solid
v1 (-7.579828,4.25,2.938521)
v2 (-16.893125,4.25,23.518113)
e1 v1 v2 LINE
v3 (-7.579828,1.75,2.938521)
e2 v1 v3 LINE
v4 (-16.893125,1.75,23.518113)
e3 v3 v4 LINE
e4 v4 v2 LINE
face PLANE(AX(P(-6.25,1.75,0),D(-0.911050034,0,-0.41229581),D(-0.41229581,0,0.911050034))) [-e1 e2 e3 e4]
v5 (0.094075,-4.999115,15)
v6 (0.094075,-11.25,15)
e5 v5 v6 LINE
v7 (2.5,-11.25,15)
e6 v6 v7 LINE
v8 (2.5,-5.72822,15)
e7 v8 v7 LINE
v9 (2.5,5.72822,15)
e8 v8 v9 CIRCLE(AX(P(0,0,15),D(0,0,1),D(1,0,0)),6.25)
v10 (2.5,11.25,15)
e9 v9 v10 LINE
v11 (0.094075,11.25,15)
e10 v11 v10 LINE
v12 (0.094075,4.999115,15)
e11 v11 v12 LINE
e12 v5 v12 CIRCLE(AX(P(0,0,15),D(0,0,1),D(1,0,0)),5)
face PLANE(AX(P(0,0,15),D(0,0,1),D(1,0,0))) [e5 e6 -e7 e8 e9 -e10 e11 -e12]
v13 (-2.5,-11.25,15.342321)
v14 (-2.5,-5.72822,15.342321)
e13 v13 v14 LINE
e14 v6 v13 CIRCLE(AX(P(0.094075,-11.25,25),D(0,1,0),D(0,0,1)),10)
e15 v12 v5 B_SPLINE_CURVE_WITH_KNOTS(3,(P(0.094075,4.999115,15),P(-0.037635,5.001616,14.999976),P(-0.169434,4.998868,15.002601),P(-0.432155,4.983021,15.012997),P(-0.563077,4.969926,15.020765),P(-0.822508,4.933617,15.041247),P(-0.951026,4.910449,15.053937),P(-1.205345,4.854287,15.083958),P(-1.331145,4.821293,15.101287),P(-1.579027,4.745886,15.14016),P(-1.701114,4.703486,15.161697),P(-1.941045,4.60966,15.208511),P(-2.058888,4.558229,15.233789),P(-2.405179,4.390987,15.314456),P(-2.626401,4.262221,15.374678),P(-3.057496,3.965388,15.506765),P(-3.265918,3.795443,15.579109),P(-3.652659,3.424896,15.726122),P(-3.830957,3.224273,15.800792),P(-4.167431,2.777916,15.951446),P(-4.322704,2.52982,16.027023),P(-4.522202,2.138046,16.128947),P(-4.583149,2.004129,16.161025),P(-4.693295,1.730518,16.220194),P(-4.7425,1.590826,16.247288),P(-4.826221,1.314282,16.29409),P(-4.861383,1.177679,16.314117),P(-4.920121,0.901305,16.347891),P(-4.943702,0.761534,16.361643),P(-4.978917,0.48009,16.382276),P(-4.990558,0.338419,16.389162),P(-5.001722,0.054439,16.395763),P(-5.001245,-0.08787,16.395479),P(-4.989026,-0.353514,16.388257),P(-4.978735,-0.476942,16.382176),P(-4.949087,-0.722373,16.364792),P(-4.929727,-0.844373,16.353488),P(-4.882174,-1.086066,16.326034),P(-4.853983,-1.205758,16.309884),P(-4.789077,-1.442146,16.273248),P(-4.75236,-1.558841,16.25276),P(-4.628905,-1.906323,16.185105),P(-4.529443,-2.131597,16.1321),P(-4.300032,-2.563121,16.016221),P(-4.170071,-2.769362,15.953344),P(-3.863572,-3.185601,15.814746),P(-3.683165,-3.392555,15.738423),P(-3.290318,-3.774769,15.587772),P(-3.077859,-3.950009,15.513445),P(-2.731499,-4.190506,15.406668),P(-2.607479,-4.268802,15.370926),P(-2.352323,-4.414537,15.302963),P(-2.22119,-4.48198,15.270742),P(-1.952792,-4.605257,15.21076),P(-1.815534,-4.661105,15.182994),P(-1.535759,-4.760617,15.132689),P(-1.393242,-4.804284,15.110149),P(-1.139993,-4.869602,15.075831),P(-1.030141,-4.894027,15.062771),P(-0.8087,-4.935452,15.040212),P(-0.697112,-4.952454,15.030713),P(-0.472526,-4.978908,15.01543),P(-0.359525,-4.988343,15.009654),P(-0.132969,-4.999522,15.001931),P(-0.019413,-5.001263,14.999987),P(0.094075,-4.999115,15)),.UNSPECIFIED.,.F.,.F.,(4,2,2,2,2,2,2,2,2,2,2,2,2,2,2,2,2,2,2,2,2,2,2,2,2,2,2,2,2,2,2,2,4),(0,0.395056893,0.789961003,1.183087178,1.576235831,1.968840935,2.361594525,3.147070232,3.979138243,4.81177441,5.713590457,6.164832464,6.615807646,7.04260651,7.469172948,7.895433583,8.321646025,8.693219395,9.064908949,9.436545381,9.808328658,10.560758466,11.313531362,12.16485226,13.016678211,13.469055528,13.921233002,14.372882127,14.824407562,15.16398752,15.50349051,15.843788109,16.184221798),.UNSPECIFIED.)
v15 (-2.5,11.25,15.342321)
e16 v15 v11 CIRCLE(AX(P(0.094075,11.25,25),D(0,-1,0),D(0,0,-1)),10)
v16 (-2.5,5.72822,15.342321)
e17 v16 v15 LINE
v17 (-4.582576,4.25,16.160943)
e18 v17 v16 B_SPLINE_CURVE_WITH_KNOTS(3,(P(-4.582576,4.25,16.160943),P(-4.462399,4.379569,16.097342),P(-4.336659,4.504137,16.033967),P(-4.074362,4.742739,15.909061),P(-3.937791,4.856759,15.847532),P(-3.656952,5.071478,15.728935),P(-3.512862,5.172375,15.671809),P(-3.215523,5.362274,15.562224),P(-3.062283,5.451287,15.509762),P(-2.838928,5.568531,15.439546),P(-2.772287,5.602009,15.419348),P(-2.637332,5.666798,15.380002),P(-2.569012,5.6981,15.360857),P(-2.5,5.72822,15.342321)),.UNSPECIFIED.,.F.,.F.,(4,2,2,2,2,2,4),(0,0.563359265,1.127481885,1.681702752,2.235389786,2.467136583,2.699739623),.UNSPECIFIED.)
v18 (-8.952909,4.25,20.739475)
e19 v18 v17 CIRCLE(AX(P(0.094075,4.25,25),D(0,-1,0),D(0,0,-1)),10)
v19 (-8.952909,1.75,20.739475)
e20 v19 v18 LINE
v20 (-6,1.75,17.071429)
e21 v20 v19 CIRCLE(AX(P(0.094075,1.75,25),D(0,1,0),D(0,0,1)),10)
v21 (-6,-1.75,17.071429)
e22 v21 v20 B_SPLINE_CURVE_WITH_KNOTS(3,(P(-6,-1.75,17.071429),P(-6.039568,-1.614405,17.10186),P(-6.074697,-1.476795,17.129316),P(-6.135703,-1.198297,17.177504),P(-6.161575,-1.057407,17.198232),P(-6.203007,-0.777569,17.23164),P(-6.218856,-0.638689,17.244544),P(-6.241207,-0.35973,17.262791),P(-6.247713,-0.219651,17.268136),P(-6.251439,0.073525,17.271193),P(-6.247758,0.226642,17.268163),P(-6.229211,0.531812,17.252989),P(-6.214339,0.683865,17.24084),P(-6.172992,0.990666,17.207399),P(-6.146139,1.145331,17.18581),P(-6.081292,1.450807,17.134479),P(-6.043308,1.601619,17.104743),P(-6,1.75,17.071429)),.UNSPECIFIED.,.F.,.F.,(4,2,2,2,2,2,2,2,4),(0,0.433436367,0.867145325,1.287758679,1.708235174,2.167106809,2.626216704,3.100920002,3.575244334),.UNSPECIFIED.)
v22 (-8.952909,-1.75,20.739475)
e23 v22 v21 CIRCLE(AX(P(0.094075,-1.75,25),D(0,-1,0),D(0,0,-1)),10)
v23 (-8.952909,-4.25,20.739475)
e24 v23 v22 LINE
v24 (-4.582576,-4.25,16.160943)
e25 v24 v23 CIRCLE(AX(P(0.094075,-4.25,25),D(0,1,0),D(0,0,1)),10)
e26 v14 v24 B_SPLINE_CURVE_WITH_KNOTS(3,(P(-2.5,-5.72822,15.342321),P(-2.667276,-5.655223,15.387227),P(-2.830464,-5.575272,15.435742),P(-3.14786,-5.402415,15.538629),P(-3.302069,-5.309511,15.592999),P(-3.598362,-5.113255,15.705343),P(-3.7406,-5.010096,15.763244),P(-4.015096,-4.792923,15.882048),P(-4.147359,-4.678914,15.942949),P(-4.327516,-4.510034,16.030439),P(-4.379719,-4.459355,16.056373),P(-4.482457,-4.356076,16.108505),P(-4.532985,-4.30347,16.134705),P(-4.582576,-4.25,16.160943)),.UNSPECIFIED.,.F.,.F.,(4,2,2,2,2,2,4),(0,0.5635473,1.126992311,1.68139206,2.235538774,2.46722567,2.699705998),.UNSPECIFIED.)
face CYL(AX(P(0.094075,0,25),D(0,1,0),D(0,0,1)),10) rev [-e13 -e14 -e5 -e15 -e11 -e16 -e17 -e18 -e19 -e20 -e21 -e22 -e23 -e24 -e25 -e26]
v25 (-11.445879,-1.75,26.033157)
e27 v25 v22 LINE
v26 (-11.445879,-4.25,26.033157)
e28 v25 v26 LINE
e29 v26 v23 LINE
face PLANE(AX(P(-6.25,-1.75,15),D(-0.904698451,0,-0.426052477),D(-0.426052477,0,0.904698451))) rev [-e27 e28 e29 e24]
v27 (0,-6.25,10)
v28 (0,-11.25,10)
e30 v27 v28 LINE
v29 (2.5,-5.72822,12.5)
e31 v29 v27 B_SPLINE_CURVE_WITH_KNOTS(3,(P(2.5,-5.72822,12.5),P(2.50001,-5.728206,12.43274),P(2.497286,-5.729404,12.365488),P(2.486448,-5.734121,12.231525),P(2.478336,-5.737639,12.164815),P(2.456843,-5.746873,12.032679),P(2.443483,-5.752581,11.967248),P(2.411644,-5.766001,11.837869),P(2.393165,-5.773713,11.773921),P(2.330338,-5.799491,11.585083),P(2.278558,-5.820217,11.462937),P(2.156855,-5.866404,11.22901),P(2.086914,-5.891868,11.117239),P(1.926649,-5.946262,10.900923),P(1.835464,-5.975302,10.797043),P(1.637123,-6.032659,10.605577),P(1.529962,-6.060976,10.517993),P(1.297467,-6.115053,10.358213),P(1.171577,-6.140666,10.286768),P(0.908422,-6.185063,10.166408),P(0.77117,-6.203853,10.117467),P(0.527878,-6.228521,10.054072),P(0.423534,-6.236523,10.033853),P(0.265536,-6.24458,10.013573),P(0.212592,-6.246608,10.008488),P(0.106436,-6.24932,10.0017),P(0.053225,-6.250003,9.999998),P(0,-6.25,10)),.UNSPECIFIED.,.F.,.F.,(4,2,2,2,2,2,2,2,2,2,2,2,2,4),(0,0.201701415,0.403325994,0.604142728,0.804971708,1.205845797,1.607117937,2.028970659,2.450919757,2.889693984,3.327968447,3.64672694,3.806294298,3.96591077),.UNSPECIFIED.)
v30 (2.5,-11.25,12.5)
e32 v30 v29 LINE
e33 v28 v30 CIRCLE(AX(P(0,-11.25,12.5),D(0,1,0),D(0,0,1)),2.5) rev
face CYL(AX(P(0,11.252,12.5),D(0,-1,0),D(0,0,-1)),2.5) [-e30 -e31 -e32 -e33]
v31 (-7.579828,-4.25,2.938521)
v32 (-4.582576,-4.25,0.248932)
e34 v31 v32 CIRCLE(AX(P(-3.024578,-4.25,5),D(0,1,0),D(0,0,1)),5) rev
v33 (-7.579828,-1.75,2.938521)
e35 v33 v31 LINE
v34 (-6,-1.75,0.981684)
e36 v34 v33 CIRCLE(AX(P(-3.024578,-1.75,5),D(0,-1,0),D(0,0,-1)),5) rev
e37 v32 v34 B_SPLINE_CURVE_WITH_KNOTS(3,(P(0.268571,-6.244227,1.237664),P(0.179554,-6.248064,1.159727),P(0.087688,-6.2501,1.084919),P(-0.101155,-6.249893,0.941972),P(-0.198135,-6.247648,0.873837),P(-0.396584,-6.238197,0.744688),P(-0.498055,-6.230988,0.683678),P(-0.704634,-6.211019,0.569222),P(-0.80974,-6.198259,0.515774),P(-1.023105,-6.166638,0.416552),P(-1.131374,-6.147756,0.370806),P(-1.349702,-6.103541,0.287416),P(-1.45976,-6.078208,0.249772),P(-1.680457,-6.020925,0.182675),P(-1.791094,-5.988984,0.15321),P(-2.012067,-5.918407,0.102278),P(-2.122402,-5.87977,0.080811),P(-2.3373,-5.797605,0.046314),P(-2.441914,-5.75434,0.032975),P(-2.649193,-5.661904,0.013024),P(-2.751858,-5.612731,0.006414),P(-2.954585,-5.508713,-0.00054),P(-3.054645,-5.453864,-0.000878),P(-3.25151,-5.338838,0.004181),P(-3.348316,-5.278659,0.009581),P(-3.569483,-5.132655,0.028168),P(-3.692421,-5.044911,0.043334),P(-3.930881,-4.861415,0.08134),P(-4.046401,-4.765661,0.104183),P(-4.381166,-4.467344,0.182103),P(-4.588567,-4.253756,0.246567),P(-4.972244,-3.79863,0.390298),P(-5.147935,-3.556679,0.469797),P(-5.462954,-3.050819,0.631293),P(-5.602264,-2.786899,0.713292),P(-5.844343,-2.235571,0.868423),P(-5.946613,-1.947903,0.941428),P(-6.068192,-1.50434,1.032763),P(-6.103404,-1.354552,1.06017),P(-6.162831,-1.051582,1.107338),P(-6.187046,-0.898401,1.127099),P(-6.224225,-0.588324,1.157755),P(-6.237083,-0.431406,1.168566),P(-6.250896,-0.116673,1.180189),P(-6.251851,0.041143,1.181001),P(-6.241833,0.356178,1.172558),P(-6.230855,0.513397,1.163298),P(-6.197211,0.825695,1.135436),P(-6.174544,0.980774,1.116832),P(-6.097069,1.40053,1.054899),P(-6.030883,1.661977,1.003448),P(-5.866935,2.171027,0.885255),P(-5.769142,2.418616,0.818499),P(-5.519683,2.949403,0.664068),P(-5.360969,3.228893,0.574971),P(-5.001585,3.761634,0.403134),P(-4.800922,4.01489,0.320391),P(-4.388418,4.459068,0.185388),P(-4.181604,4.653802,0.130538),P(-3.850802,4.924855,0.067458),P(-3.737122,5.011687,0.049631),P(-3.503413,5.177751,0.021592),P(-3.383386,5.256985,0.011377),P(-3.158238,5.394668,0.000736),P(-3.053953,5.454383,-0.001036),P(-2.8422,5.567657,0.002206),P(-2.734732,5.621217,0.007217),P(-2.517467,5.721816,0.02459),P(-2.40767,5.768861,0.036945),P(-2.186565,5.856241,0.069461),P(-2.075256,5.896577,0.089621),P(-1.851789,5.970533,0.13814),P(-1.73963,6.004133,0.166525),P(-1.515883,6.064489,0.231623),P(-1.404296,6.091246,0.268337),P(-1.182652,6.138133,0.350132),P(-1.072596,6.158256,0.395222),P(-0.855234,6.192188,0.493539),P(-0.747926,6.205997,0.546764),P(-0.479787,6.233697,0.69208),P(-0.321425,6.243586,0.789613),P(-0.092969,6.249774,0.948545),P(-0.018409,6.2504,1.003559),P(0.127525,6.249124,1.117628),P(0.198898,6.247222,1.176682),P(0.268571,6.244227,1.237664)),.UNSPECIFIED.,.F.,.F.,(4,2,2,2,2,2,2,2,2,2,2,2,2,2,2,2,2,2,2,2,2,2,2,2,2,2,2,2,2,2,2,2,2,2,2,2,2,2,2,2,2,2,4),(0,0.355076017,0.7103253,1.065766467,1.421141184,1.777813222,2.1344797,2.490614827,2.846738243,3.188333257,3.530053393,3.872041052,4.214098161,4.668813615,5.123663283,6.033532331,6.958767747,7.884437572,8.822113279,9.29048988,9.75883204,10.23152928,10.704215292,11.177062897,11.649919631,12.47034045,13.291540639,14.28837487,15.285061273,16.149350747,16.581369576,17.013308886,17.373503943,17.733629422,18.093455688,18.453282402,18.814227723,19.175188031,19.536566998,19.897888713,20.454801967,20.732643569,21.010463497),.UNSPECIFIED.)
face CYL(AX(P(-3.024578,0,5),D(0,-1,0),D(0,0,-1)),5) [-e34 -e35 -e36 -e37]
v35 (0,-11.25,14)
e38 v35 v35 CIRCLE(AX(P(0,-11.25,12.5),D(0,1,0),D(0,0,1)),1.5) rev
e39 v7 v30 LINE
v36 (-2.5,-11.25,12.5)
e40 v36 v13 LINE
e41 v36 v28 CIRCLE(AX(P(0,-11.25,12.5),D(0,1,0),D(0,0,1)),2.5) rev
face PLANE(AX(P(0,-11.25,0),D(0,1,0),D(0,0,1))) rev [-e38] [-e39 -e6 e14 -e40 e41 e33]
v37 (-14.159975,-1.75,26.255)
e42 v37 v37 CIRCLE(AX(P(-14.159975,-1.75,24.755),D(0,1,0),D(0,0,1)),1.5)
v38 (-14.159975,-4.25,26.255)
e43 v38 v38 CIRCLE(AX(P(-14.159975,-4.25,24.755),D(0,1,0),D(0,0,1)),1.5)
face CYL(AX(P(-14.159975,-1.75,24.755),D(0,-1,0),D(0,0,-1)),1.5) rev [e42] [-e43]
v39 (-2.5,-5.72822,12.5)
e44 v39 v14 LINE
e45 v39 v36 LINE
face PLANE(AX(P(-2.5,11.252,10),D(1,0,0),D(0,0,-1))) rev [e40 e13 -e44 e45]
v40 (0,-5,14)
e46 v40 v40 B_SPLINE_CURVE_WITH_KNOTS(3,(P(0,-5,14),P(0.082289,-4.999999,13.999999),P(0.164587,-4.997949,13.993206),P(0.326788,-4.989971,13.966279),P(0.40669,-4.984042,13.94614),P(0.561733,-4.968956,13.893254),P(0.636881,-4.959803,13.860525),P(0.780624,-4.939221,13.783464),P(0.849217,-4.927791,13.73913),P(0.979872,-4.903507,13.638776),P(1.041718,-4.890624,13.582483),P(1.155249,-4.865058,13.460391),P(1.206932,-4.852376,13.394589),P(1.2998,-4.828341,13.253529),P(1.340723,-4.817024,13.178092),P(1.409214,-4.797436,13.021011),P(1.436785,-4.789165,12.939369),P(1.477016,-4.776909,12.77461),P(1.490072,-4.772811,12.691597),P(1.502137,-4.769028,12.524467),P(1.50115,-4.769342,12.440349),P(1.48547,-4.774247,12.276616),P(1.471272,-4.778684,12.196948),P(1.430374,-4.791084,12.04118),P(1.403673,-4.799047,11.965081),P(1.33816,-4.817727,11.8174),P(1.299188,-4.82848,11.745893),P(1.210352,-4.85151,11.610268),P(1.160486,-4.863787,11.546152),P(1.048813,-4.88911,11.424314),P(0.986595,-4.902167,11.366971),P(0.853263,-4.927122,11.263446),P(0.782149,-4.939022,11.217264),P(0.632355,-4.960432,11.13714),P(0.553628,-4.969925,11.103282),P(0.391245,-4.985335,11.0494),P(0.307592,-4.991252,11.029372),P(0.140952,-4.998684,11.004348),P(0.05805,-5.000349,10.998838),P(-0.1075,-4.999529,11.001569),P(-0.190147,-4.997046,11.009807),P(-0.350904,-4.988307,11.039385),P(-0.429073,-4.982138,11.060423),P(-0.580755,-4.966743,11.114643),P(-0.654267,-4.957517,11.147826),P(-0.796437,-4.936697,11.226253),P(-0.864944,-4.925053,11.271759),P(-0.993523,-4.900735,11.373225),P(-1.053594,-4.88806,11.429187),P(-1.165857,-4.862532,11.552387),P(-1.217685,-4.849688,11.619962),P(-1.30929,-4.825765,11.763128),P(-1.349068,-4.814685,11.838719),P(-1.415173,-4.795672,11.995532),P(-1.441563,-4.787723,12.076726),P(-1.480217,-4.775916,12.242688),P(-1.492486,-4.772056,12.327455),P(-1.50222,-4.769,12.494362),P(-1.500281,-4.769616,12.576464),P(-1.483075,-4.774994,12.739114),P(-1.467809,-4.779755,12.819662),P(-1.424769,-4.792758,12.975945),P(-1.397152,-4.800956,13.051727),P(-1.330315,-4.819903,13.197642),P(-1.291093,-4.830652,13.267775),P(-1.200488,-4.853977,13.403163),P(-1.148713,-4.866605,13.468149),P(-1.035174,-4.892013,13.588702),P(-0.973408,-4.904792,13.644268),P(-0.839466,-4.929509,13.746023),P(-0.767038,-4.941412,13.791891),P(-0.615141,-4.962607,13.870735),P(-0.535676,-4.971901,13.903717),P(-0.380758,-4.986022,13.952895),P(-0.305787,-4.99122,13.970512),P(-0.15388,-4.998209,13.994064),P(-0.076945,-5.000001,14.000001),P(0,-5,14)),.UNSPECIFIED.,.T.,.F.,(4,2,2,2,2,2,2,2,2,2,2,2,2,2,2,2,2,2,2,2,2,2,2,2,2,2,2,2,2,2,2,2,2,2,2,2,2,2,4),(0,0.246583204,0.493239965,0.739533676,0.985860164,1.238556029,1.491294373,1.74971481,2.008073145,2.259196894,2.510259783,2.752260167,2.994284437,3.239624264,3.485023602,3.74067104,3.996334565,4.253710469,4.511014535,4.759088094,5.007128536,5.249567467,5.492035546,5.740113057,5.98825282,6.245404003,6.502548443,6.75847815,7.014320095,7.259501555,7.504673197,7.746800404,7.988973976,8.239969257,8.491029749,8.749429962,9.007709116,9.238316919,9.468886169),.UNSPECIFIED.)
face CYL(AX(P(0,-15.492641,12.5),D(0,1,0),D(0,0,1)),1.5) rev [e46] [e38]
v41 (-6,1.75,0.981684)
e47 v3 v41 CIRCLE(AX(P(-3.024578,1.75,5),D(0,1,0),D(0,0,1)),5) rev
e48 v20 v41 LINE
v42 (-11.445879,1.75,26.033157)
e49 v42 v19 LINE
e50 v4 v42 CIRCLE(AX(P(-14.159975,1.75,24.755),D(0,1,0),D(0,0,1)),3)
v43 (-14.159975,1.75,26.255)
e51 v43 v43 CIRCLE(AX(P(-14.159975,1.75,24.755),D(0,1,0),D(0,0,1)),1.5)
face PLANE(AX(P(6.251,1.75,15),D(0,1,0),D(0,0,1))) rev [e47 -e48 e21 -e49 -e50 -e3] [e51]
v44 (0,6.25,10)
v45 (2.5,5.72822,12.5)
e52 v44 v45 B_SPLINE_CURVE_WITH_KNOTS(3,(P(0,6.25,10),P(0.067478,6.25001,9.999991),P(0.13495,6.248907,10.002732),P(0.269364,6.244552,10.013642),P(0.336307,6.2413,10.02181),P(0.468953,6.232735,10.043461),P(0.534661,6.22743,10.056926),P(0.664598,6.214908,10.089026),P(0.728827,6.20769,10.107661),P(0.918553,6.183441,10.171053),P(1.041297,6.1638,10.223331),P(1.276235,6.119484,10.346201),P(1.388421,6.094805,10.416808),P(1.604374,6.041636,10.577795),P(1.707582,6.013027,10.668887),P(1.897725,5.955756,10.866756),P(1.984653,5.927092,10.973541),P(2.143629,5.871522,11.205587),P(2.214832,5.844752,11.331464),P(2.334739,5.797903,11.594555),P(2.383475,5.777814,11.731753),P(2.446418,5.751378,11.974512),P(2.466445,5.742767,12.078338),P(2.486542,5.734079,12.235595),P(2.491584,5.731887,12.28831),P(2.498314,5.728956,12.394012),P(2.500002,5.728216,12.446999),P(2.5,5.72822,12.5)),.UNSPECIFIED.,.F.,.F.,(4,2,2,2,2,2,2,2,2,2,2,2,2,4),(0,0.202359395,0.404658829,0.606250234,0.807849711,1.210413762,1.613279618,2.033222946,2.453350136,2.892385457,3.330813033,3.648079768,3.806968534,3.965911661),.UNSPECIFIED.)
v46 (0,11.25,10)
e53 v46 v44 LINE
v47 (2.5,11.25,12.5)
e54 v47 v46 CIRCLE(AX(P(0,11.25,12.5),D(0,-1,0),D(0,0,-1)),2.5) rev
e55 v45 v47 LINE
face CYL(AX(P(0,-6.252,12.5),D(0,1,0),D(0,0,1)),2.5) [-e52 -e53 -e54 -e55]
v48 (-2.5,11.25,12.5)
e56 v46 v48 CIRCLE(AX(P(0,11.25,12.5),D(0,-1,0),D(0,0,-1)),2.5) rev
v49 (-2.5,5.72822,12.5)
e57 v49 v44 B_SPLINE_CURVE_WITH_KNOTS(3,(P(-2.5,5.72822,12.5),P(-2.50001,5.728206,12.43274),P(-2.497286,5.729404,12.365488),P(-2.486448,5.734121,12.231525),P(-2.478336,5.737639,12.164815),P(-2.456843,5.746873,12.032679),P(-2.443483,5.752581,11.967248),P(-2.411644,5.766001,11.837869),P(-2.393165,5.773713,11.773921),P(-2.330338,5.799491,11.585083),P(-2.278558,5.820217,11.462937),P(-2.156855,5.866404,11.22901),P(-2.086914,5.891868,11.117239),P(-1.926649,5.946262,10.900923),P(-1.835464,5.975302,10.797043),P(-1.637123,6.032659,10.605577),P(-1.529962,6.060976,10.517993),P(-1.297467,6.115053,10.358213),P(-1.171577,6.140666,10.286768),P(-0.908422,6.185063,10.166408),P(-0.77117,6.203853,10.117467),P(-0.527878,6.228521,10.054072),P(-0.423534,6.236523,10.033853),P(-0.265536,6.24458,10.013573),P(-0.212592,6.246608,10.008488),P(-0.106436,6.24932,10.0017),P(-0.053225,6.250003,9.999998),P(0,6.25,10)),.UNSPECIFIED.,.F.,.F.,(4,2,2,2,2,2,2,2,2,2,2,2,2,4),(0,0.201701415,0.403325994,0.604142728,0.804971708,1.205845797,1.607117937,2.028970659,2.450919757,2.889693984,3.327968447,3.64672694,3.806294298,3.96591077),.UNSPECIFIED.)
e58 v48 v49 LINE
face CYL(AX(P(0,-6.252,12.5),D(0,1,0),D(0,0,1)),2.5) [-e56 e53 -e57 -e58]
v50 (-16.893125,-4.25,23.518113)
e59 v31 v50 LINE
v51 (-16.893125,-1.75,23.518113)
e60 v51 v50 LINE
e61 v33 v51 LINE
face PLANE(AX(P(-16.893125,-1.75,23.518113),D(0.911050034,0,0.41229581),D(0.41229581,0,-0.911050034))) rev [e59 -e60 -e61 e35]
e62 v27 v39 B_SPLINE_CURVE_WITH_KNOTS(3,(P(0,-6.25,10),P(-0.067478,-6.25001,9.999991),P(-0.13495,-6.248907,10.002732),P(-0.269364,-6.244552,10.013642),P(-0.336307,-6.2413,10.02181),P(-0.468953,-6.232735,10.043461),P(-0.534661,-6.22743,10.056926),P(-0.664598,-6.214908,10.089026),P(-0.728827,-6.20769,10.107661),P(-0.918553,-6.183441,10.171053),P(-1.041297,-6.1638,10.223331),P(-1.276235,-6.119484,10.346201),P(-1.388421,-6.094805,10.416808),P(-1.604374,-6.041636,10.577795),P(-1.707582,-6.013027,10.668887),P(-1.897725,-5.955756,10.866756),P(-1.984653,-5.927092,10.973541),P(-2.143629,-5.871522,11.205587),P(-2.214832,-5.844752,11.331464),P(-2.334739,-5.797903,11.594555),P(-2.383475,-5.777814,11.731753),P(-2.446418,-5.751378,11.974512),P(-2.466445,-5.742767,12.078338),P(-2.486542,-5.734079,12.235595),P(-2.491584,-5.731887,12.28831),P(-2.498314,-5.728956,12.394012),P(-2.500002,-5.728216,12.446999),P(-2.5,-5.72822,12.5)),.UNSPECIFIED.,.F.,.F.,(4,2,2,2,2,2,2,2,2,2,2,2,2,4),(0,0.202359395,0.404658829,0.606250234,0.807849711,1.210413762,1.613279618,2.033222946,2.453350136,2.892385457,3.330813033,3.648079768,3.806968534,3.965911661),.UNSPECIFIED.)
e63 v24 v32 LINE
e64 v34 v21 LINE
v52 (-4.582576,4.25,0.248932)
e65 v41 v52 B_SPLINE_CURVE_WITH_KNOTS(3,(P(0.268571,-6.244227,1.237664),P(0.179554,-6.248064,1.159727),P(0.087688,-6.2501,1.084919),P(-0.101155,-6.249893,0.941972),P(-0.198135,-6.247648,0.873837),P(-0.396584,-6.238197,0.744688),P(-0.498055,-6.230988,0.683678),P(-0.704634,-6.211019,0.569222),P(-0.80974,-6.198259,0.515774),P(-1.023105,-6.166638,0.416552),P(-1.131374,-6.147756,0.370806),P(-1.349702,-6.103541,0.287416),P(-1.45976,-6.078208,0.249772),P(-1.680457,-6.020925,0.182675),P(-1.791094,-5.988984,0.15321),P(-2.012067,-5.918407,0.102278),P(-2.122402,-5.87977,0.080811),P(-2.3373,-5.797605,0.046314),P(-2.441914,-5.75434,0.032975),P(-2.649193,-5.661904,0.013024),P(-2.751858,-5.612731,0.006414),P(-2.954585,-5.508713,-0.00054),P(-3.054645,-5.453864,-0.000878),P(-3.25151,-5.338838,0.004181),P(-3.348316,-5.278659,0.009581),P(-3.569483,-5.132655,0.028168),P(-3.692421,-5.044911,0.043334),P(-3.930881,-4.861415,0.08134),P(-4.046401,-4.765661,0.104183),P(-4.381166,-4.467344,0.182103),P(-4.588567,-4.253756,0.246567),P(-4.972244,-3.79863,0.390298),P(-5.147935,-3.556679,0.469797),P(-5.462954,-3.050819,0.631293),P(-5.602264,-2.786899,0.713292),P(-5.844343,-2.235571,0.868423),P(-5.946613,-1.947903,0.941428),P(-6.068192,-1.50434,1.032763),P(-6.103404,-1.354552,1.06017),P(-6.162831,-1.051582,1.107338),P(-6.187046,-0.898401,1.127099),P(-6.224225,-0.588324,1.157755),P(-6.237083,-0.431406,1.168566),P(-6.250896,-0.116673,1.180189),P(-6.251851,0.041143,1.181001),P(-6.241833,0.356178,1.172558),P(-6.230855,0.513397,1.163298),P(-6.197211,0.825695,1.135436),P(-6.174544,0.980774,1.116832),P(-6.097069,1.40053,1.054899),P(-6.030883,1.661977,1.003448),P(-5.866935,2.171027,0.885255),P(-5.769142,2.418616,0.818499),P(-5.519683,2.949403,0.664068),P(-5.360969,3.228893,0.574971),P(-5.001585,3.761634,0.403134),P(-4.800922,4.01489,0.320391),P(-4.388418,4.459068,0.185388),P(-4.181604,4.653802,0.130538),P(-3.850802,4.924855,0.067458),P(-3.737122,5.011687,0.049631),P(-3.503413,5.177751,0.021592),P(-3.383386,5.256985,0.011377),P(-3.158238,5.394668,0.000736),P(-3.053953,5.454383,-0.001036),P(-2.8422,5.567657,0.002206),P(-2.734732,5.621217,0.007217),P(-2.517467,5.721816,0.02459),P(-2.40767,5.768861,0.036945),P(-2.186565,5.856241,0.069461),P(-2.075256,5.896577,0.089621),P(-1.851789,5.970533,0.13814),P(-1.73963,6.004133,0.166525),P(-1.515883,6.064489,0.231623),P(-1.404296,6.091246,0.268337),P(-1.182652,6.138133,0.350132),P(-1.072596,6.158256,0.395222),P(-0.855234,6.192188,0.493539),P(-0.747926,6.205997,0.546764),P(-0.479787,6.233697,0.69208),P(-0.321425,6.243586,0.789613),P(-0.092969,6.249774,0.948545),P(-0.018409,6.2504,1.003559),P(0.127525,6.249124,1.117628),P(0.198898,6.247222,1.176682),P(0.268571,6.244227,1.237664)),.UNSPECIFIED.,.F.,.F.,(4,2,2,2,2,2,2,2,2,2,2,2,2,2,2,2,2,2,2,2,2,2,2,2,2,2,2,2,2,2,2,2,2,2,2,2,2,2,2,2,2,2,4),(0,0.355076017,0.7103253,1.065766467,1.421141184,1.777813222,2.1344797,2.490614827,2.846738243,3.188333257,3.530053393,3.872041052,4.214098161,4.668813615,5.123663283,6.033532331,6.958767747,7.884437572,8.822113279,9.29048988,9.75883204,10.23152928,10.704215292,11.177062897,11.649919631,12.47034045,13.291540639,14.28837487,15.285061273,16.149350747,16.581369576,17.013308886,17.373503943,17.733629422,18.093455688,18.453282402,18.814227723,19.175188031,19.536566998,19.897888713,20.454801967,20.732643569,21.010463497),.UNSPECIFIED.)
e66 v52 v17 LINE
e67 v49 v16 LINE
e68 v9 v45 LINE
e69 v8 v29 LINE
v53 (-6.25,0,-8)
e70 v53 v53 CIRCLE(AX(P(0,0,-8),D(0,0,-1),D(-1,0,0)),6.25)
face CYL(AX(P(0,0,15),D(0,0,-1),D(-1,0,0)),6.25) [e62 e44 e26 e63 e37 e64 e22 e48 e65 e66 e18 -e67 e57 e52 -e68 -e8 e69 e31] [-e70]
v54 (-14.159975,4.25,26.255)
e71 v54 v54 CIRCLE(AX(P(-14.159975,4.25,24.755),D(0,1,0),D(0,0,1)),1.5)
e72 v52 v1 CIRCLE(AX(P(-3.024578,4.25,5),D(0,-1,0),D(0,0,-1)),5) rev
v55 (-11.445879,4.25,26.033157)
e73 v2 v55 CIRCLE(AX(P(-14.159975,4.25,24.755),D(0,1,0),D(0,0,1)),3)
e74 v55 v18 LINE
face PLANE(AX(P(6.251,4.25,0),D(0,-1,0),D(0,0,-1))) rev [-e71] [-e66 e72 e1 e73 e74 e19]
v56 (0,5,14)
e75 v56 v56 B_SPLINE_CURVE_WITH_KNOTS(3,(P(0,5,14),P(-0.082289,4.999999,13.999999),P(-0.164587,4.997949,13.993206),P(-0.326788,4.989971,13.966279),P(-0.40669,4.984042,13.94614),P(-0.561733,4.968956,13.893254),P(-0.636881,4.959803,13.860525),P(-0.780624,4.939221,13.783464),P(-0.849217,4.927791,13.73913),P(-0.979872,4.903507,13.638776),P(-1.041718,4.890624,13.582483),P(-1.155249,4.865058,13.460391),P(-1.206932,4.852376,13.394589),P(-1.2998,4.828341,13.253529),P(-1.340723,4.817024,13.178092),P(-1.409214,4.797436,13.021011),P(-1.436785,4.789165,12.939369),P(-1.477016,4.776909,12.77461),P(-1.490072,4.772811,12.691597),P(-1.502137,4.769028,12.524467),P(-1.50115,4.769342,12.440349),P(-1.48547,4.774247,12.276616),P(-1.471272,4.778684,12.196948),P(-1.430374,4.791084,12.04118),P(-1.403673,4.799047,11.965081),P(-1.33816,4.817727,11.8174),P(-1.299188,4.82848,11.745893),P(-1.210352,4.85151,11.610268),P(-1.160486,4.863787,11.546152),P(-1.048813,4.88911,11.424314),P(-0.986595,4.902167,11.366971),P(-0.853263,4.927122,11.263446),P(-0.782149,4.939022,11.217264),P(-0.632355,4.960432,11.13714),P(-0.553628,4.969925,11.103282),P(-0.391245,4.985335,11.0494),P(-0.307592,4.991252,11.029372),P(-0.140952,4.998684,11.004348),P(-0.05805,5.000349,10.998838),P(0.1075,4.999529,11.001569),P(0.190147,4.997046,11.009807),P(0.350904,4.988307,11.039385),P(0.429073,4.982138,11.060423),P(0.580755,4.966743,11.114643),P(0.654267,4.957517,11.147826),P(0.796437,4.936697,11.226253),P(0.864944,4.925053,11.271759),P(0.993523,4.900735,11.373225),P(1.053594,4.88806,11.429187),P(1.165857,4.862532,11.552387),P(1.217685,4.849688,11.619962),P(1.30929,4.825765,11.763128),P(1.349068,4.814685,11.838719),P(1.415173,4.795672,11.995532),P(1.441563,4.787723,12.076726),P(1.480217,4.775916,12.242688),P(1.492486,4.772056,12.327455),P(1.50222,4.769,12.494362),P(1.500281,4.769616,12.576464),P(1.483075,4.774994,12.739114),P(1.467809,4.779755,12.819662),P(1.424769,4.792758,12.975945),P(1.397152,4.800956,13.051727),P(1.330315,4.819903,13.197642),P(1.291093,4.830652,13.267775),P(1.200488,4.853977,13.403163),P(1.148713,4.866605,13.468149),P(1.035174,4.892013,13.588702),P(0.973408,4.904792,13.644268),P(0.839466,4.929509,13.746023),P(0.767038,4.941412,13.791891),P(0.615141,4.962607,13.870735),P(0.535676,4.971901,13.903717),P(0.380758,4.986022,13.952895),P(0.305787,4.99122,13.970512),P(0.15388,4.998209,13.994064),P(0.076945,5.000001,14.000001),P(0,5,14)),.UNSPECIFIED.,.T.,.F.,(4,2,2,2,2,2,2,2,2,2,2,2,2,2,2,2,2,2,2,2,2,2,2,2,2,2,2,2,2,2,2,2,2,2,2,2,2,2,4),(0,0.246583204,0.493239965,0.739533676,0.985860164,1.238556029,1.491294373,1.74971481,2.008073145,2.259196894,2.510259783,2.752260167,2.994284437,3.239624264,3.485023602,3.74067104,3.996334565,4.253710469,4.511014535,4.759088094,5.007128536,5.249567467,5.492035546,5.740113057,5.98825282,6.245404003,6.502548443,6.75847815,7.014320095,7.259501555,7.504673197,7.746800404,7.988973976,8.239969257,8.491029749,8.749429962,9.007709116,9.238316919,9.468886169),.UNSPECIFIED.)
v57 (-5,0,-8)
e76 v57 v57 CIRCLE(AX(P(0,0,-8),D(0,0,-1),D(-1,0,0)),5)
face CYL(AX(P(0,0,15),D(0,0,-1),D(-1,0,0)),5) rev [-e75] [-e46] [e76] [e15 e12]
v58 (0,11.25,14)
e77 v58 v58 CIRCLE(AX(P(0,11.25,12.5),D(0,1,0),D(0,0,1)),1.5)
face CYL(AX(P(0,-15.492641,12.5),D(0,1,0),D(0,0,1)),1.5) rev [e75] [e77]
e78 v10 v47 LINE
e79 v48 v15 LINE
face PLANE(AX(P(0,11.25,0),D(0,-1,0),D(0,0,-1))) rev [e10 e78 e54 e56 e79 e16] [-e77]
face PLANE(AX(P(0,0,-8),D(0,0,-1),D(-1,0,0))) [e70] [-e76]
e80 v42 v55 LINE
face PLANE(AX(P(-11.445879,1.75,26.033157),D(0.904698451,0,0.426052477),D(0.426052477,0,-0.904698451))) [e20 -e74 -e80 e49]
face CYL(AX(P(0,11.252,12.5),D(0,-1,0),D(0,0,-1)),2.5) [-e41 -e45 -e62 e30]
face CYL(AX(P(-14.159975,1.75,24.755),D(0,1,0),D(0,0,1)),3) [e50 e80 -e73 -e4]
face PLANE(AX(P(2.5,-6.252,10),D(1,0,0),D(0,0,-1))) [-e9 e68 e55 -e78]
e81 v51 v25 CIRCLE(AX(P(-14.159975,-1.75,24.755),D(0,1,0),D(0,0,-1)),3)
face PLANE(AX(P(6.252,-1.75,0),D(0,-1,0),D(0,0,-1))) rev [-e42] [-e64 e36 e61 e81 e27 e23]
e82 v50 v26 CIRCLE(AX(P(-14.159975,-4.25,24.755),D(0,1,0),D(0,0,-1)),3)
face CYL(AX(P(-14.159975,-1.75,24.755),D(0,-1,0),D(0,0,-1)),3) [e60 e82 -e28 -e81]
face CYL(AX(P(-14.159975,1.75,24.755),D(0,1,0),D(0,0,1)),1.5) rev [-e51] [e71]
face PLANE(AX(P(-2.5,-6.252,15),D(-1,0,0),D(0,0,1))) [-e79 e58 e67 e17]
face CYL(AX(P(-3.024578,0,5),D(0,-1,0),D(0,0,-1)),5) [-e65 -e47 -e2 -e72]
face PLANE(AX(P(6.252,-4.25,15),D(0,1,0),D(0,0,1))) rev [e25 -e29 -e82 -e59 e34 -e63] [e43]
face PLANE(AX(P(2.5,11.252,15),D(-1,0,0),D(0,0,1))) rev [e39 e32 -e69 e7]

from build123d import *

# Parameters (mm, degrees)
CROQUIS1_R                   = 6.25
CROQUIS1_R_2                 = 5
SALIENTE_EXTRUIR1_DEPTH      = 15
SALIENTE_EXTRUIR2_REACH      = 25.881
SALIENTE_EXTRUIR2_END_RADIUS = 6.25
CROQUIS2_W                   = 5
CROQUIS2_H                   = 5
SALIENTE_EXTRUIR3_REACH      = 29.755
SALIENTE_EXTRUIR3_END_RADIUS = 6.25
CROQUIS3_W                   = 5
CROQUIS3_H                   = 5
CORTAR_EXTRUIR1_REACH        = 29.755
CROQUIS4_R                   = 1.5
REDONDEO1_R                  = 2.5
CROQUIS5_R                   = 1.5
SALIENTE_EXTRUIR4_DEPTH      = 2.5
SALIENTE_EXTRUIR5_REACH      = 34.452
CROQUIS6_W                   = 15
CROQUIS6_H                   = 2.5
CROQUIS7_R                   = 1.5
SALIENTE_EXTRUIR6_DEPTH      = 2.5
SALIENTE_EXTRUIR7_REACH      = 34.452
SALIENTE_EXTRUIR7_END_RADIUS = 6.25
CROQUIS8_W                   = 15
CROQUIS8_H                   = 2.5
REDONDEO2_R                  = 5
REDONDEO4_R                  = 10
SALIENTE_EXTRUIR9_REACH      = 43.224
CROQUIS10_R                  = 6.25
CROQUIS10_R_2                = 5


# Some blends are built 0.0001 mm under size
with BuildPart() as part:
    # Croquis1 → Saliente-Extruir1 (new body)
    with BuildSketch(Plane.XY):
        Circle(CROQUIS1_R)
        Circle(CROQUIS1_R_2, mode=Mode.SUBTRACT)
    extrude(amount=SALIENTE_EXTRUIR1_DEPTH)

    # Saliente-Extruir2: up to this cylinder (the profile starts outside it)
    saliente_extruir2_end = Plane(origin=(0, 0, 12.5), z_dir=(0, 0, -1)) * Cylinder(SALIENTE_EXTRUIR2_END_RADIUS, 65.262, mode=Mode.PRIVATE)
    # Croquis2 → Saliente-Extruir2 (add, up to the surface)
    with BuildSketch(Plane(origin=(0, 11.25, 0), x_dir=(1, 0, 0), z_dir=(0, 1, 0)), mode=Mode.PRIVATE) as saliente_extruir2_sk1:
        with Locations((0, -12.5)):
            Rectangle(CROQUIS2_W, CROQUIS2_H)
    saliente_extruir2_tool1 = extrude(saliente_extruir2_sk1.sketch, amount=-SALIENTE_EXTRUIR2_REACH, mode=Mode.PRIVATE) - saliente_extruir2_end
    add(saliente_extruir2_tool1.solids().sort_by_distance((0, 11.25, 12.5))[0])

    # Saliente-Extruir3: up to this cylinder (the profile starts outside it)
    saliente_extruir3_end = Plane(origin=(0, 0, 12.5), z_dir=(0, 0, -1)) * Cylinder(SALIENTE_EXTRUIR3_END_RADIUS, 73.01, mode=Mode.PRIVATE)
    # Croquis3 → Saliente-Extruir3 (add, up to the surface)
    with BuildSketch(Plane(origin=(0, -11.25, 0), x_dir=(1, 0, 0), z_dir=(0, 1, 0)), mode=Mode.PRIVATE) as saliente_extruir3_sk1:
        with Locations((0, -12.5)):
            Rectangle(CROQUIS3_W, CROQUIS3_H)
    saliente_extruir3_tool1 = extrude(saliente_extruir3_sk1.sketch, amount=SALIENTE_EXTRUIR3_REACH, mode=Mode.PRIVATE) - saliente_extruir3_end
    add(saliente_extruir3_tool1.solids().sort_by_distance((0, -11.25, 12.5))[0])

    # Cortar-Extruir1: up to this face of the body (flat: up to its plane)
    cortar_extruir1_end = Plane(part.part.faces().sort_by_distance((0, -11.25, 12.5))[0])
    # Croquis4 → Cortar-Extruir1 (cut, up to the picked face)
    with BuildSketch(Plane(origin=(0, 11.25, 0), x_dir=(1, 0, 0), z_dir=(0, 1, 0)), mode=Mode.PRIVATE) as cortar_extruir1_sk1:
        with Locations(Location((0, -12.5, 0), (0, 0, 270))):
            Circle(CROQUIS4_R)
    cortar_extruir1_tool1 = split(extrude(cortar_extruir1_sk1.sketch, amount=-CORTAR_EXTRUIR1_REACH, mode=Mode.PRIVATE), bisect_by=cortar_extruir1_end, keep=Keep.BOTH, mode=Mode.PRIVATE)
    add(cortar_extruir1_tool1.solids().sort_by(Axis((0, 11.25, 12.5), (0, -1, 0)))[0], mode=Mode.SUBTRACT)

    # Redondeo1
    redondeo1_edges = [part.edges().sort_by_distance(p)[0] for p in [
        (-2.5, -8.489109809, 10),
        (2.5, -8.489109809, 10),
        (-2.5, 8.489109809, 10),
        (2.5, 8.489109809, 10),
    ]]
    fillet(redondeo1_edges, radius=REDONDEO1_R - 0.0001)  # a hair under: the kernel refuses the full size

    # Croquis6 → Saliente-Extruir5 (add, up to next)
    with BuildSketch(Plane(origin=(-6.25, 0, 0), x_dir=(0, 0, -1), z_dir=(1, 0, 0)), mode=Mode.PRIVATE) as saliente_extruir5_sk1:
        with Locations((-7.5, -3)):
            Rectangle(CROQUIS6_W, CROQUIS6_H)
    saliente_extruir5_tool1 = extrude(saliente_extruir5_sk1.sketch, amount=SALIENTE_EXTRUIR5_REACH, mode=Mode.PRIVATE) - part.part


with BuildPart() as body_2:
    # Croquis5 → Saliente-Extruir4 (new body)
    with BuildSketch(Plane(origin=(0, -4.25, 0), x_dir=(1, 0, 0), z_dir=(0, 1, 0))):
        with BuildLine():
            Line((-6.25, -15), (-11.445879417, -26.033157432))
            ThreePointArc((-11.445879417, -26.033157432), (-15.41753329, -27.478700895), (-16.893124871, -23.518112569))
            Line((-16.893124871, -23.518112569), (-6.25, 0))
            Line((-6.25, 0), (-6.25, -15))
        make_face()
        with Locations(Location((-14.159974768, -24.755, 0), (0, 0, 270))):
            Circle(CROQUIS5_R, mode=Mode.SUBTRACT)
    extrude(amount=SALIENTE_EXTRUIR4_DEPTH)


with BuildPart() as part_1:
    add(part.part)

    add(body_2.part)  # Saliente-Extruir5 merges body 2
    add(saliente_extruir5_tool1.solids().sort_by_distance((-6.25, -3, 7.5))[0])



with BuildPart() as body_2_2:
    # Croquis7 → Saliente-Extruir6 (new body)
    with BuildSketch(Plane(origin=(0, 4.25, 0), x_dir=(1, 0, 0), z_dir=(0, 1, 0))):
        with BuildLine():
            Line((-11.445879417, -26.033157432), (-6.25, -15))
            Line((-6.25, -15), (-6.25, 0))
            Line((-6.25, 0), (-16.893124871, -23.518112569))
            ThreePointArc((-16.893124871, -23.518112569), (-15.41753329, -27.478700895), (-11.445879417, -26.033157432))
        make_face()
        with Locations(Location((-14.159974768, -24.755, 0), (0, 0, 270))):
            Circle(CROQUIS7_R, mode=Mode.SUBTRACT)
    extrude(amount=-SALIENTE_EXTRUIR6_DEPTH)


with BuildPart() as part_2:
    add(part_1.part)

    add(body_2_2.part)  # Saliente-Extruir7 merges body 2 2
    # Saliente-Extruir7: up to this cylinder (the profile starts outside it)
    saliente_extruir7_end = Plane(origin=(0, 0, 7.5), z_dir=(0, 0, -1)) * Cylinder(SALIENTE_EXTRUIR7_END_RADIUS, 82.404, mode=Mode.PRIVATE)
    # Croquis8 → Saliente-Extruir7 (add, up to the surface)
    with BuildSketch(Plane(origin=(-6.25, 0, 0), x_dir=(0, 0, -1), z_dir=(1, 0, 0)), mode=Mode.PRIVATE) as saliente_extruir7_sk1:
        with Locations((-7.5, 3)):
            Rectangle(CROQUIS8_W, CROQUIS8_H)
    saliente_extruir7_tool1 = extrude(saliente_extruir7_sk1.sketch, amount=SALIENTE_EXTRUIR7_REACH, mode=Mode.PRIVATE) - saliente_extruir7_end
    add(saliente_extruir7_tool1.solids().sort_by_distance((-6.25, 3, 7.5))[0])

    # Redondeo2
    # the kernel refuses this fillet: 5 mm, written as the material it takes off along each edge
    with BuildSketch(Plane(origin=(-6.25, 12.313555344, 0), x_dir=(1, 0, 0), z_dir=(0, -1, 0))) as redondeo2_piece_1:
        with BuildLine():
            CenterArc((REDONDEO2_R * 0.645084427485, REDONDEO2_R), REDONDEO2_R, 204.349135832, 65.650864168)
            Line((-REDONDEO2_R * 0.265965606724, REDONDEO2_R * 0.587704189728), (0, 0))
            Line((0, 0), (REDONDEO2_R * 0.645084427485, 0))
        make_face()
    extrude(amount=18.627110687, mode=Mode.SUBTRACT)

    # Redondeo4
    # the kernel refuses this fillet: 10 mm, written as the material it adds along each edge
    with BuildSketch(Plane(origin=(-6.25, 20.110188614, 15), x_dir=(1, 0, 0), z_dir=(0, -1, 0))) as redondeo4_piece_1_section:
        with BuildLine():
            CenterArc((REDONDEO4_R * 0.634407544548, REDONDEO4_R), REDONDEO4_R, 205.2173, 64.7827)
            Line((-REDONDEO4_R * 0.27029090604, REDONDEO4_R * 0.573947522594), (0, 0))
            Line((0, 0), (REDONDEO4_R * 0.634407544548, 0))
        make_face()
    redondeo4_piece_1 = extrude(amount=34.220377227, mode=Mode.PRIVATE)
    redondeo4_piece_1 = split(redondeo4_piece_1, bisect_by=Plane(origin=(-2.5, 8.596165387, 15.10356988), z_dir=(1, 0, 0)), keep=Keep.TOP, mode=Mode.PRIVATE)
    redondeo4_piece_1 = split(redondeo4_piece_1, bisect_by=Plane(origin=(-1.866709216, -11.25, 15.10356988), z_dir=(0, 1, 0)), keep=Keep.TOP, mode=Mode.PRIVATE)
    redondeo4_piece_1 = split(redondeo4_piece_1, bisect_by=Plane(origin=(-1.866709216, 11.25, 15.10356988), z_dir=(0, -1, 0)), keep=Keep.TOP, mode=Mode.PRIVATE)
    redondeo4_piece_1 = redondeo4_piece_1 - Plane(origin=(0, 0, 15.10356988), x_dir=(1, 0, 0), z_dir=(0, 0, -1)) * Cylinder(5, 94, mode=Mode.PRIVATE)
    add(redondeo4_piece_1)
    with BuildSketch(Plane(origin=(-6.25, 4.25, 15), x_dir=(1, 0, 0), z_dir=(0, -1, 0))) as redondeo4_piece_2_section:
        with BuildLine():
            CenterArc((REDONDEO4_R * 0.634407544548, REDONDEO4_R), REDONDEO4_R, 205.2173, 64.7827)
            Line((-REDONDEO4_R * 0.27029090604, REDONDEO4_R * 0.573947522594), (0, 0))
            Line((0, 0), (REDONDEO4_R * 0.634407544548, 0))
        make_face()
    redondeo4_piece_2 = extrude(amount=2.5, mode=Mode.PRIVATE)
    redondeo4_piece_2 = redondeo4_piece_2 - Plane(origin=(0, 0, 16.752062652), x_dir=(1, 0, 0), z_dir=(0, 0, -1)) * Cylinder(5, 31, mode=Mode.PRIVATE)
    add(redondeo4_piece_2)
    with BuildSketch(Plane(origin=(-6.25, 20.110188614, 15), x_dir=(1, 0, 0), z_dir=(0, -1, 0))) as redondeo4_piece_3_section:
        with BuildLine():
            CenterArc((REDONDEO4_R * 0.634407544548, REDONDEO4_R), REDONDEO4_R, 205.2173, 64.7827)
            Line((-REDONDEO4_R * 0.27029090604, REDONDEO4_R * 0.573947522594), (0, 0))
            Line((0, 0), (REDONDEO4_R * 0.634407544548, 0))
        make_face()
    redondeo4_piece_3 = extrude(amount=34.220377227, mode=Mode.PRIVATE)
    redondeo4_piece_3 = redondeo4_piece_3 & Plane(origin=(0, 0, 15.324058302), x_dir=(1, 0, 0), z_dir=(0, 0, -1)) * Cylinder(6.25, 94, mode=Mode.PRIVATE)
    redondeo4_piece_3 = redondeo4_piece_3 - Plane(origin=(0, 0, 15.324058302), x_dir=(1, 0, 0), z_dir=(0, 0, -1)) * Cylinder(5, 94, mode=Mode.PRIVATE)
    add(redondeo4_piece_3)
    with BuildSketch(Plane(origin=(-6.25, 20.110188614, 15), x_dir=(1, 0, 0), z_dir=(0, -1, 0))) as redondeo4_piece_4_section:
        with BuildLine():
            CenterArc((REDONDEO4_R * 0.634407544548, REDONDEO4_R), REDONDEO4_R, 205.2173, 64.7827)
            Line((-REDONDEO4_R * 0.27029090604, REDONDEO4_R * 0.573947522594), (0, 0))
            Line((0, 0), (REDONDEO4_R * 0.634407544548, 0))
        make_face()
    redondeo4_piece_4 = extrude(amount=34.220377227, mode=Mode.PRIVATE)
    redondeo4_piece_4 = split(redondeo4_piece_4, bisect_by=Plane(origin=(-6.508076771, -4.25, 16.752062651), z_dir=(0, 1, 0)), keep=Keep.TOP, mode=Mode.PRIVATE)
    redondeo4_piece_4 = split(redondeo4_piece_4, bisect_by=Plane(origin=(-6.508076771, -1.75, 16.752062651), z_dir=(0, -1, 0)), keep=Keep.TOP, mode=Mode.PRIVATE)
    redondeo4_piece_4 = redondeo4_piece_4 - Plane(origin=(0, 0, 16.752062651), x_dir=(1, 0, 0), z_dir=(0, 0, -1)) * Cylinder(5, 94, mode=Mode.PRIVATE)
    add(redondeo4_piece_4)

    # Croquis10 → Saliente-Extruir9 (add, up to next)
    with BuildSketch(Plane(origin=(0, 0, -8), x_dir=(-1, 0, 0), z_dir=(0, 0, -1)), mode=Mode.PRIVATE) as saliente_extruir9_sk1:
        Circle(CROQUIS10_R)
        Circle(CROQUIS10_R_2, mode=Mode.SUBTRACT)
    saliente_extruir9_tool1 = extrude(saliente_extruir9_sk1.sketch, amount=-SALIENTE_EXTRUIR9_REACH, mode=Mode.PRIVATE) - part_2.part
    add(saliente_extruir9_tool1.solids().sort_by_distance((6.073223, 0, -8))[0])


solid = part_2.part
